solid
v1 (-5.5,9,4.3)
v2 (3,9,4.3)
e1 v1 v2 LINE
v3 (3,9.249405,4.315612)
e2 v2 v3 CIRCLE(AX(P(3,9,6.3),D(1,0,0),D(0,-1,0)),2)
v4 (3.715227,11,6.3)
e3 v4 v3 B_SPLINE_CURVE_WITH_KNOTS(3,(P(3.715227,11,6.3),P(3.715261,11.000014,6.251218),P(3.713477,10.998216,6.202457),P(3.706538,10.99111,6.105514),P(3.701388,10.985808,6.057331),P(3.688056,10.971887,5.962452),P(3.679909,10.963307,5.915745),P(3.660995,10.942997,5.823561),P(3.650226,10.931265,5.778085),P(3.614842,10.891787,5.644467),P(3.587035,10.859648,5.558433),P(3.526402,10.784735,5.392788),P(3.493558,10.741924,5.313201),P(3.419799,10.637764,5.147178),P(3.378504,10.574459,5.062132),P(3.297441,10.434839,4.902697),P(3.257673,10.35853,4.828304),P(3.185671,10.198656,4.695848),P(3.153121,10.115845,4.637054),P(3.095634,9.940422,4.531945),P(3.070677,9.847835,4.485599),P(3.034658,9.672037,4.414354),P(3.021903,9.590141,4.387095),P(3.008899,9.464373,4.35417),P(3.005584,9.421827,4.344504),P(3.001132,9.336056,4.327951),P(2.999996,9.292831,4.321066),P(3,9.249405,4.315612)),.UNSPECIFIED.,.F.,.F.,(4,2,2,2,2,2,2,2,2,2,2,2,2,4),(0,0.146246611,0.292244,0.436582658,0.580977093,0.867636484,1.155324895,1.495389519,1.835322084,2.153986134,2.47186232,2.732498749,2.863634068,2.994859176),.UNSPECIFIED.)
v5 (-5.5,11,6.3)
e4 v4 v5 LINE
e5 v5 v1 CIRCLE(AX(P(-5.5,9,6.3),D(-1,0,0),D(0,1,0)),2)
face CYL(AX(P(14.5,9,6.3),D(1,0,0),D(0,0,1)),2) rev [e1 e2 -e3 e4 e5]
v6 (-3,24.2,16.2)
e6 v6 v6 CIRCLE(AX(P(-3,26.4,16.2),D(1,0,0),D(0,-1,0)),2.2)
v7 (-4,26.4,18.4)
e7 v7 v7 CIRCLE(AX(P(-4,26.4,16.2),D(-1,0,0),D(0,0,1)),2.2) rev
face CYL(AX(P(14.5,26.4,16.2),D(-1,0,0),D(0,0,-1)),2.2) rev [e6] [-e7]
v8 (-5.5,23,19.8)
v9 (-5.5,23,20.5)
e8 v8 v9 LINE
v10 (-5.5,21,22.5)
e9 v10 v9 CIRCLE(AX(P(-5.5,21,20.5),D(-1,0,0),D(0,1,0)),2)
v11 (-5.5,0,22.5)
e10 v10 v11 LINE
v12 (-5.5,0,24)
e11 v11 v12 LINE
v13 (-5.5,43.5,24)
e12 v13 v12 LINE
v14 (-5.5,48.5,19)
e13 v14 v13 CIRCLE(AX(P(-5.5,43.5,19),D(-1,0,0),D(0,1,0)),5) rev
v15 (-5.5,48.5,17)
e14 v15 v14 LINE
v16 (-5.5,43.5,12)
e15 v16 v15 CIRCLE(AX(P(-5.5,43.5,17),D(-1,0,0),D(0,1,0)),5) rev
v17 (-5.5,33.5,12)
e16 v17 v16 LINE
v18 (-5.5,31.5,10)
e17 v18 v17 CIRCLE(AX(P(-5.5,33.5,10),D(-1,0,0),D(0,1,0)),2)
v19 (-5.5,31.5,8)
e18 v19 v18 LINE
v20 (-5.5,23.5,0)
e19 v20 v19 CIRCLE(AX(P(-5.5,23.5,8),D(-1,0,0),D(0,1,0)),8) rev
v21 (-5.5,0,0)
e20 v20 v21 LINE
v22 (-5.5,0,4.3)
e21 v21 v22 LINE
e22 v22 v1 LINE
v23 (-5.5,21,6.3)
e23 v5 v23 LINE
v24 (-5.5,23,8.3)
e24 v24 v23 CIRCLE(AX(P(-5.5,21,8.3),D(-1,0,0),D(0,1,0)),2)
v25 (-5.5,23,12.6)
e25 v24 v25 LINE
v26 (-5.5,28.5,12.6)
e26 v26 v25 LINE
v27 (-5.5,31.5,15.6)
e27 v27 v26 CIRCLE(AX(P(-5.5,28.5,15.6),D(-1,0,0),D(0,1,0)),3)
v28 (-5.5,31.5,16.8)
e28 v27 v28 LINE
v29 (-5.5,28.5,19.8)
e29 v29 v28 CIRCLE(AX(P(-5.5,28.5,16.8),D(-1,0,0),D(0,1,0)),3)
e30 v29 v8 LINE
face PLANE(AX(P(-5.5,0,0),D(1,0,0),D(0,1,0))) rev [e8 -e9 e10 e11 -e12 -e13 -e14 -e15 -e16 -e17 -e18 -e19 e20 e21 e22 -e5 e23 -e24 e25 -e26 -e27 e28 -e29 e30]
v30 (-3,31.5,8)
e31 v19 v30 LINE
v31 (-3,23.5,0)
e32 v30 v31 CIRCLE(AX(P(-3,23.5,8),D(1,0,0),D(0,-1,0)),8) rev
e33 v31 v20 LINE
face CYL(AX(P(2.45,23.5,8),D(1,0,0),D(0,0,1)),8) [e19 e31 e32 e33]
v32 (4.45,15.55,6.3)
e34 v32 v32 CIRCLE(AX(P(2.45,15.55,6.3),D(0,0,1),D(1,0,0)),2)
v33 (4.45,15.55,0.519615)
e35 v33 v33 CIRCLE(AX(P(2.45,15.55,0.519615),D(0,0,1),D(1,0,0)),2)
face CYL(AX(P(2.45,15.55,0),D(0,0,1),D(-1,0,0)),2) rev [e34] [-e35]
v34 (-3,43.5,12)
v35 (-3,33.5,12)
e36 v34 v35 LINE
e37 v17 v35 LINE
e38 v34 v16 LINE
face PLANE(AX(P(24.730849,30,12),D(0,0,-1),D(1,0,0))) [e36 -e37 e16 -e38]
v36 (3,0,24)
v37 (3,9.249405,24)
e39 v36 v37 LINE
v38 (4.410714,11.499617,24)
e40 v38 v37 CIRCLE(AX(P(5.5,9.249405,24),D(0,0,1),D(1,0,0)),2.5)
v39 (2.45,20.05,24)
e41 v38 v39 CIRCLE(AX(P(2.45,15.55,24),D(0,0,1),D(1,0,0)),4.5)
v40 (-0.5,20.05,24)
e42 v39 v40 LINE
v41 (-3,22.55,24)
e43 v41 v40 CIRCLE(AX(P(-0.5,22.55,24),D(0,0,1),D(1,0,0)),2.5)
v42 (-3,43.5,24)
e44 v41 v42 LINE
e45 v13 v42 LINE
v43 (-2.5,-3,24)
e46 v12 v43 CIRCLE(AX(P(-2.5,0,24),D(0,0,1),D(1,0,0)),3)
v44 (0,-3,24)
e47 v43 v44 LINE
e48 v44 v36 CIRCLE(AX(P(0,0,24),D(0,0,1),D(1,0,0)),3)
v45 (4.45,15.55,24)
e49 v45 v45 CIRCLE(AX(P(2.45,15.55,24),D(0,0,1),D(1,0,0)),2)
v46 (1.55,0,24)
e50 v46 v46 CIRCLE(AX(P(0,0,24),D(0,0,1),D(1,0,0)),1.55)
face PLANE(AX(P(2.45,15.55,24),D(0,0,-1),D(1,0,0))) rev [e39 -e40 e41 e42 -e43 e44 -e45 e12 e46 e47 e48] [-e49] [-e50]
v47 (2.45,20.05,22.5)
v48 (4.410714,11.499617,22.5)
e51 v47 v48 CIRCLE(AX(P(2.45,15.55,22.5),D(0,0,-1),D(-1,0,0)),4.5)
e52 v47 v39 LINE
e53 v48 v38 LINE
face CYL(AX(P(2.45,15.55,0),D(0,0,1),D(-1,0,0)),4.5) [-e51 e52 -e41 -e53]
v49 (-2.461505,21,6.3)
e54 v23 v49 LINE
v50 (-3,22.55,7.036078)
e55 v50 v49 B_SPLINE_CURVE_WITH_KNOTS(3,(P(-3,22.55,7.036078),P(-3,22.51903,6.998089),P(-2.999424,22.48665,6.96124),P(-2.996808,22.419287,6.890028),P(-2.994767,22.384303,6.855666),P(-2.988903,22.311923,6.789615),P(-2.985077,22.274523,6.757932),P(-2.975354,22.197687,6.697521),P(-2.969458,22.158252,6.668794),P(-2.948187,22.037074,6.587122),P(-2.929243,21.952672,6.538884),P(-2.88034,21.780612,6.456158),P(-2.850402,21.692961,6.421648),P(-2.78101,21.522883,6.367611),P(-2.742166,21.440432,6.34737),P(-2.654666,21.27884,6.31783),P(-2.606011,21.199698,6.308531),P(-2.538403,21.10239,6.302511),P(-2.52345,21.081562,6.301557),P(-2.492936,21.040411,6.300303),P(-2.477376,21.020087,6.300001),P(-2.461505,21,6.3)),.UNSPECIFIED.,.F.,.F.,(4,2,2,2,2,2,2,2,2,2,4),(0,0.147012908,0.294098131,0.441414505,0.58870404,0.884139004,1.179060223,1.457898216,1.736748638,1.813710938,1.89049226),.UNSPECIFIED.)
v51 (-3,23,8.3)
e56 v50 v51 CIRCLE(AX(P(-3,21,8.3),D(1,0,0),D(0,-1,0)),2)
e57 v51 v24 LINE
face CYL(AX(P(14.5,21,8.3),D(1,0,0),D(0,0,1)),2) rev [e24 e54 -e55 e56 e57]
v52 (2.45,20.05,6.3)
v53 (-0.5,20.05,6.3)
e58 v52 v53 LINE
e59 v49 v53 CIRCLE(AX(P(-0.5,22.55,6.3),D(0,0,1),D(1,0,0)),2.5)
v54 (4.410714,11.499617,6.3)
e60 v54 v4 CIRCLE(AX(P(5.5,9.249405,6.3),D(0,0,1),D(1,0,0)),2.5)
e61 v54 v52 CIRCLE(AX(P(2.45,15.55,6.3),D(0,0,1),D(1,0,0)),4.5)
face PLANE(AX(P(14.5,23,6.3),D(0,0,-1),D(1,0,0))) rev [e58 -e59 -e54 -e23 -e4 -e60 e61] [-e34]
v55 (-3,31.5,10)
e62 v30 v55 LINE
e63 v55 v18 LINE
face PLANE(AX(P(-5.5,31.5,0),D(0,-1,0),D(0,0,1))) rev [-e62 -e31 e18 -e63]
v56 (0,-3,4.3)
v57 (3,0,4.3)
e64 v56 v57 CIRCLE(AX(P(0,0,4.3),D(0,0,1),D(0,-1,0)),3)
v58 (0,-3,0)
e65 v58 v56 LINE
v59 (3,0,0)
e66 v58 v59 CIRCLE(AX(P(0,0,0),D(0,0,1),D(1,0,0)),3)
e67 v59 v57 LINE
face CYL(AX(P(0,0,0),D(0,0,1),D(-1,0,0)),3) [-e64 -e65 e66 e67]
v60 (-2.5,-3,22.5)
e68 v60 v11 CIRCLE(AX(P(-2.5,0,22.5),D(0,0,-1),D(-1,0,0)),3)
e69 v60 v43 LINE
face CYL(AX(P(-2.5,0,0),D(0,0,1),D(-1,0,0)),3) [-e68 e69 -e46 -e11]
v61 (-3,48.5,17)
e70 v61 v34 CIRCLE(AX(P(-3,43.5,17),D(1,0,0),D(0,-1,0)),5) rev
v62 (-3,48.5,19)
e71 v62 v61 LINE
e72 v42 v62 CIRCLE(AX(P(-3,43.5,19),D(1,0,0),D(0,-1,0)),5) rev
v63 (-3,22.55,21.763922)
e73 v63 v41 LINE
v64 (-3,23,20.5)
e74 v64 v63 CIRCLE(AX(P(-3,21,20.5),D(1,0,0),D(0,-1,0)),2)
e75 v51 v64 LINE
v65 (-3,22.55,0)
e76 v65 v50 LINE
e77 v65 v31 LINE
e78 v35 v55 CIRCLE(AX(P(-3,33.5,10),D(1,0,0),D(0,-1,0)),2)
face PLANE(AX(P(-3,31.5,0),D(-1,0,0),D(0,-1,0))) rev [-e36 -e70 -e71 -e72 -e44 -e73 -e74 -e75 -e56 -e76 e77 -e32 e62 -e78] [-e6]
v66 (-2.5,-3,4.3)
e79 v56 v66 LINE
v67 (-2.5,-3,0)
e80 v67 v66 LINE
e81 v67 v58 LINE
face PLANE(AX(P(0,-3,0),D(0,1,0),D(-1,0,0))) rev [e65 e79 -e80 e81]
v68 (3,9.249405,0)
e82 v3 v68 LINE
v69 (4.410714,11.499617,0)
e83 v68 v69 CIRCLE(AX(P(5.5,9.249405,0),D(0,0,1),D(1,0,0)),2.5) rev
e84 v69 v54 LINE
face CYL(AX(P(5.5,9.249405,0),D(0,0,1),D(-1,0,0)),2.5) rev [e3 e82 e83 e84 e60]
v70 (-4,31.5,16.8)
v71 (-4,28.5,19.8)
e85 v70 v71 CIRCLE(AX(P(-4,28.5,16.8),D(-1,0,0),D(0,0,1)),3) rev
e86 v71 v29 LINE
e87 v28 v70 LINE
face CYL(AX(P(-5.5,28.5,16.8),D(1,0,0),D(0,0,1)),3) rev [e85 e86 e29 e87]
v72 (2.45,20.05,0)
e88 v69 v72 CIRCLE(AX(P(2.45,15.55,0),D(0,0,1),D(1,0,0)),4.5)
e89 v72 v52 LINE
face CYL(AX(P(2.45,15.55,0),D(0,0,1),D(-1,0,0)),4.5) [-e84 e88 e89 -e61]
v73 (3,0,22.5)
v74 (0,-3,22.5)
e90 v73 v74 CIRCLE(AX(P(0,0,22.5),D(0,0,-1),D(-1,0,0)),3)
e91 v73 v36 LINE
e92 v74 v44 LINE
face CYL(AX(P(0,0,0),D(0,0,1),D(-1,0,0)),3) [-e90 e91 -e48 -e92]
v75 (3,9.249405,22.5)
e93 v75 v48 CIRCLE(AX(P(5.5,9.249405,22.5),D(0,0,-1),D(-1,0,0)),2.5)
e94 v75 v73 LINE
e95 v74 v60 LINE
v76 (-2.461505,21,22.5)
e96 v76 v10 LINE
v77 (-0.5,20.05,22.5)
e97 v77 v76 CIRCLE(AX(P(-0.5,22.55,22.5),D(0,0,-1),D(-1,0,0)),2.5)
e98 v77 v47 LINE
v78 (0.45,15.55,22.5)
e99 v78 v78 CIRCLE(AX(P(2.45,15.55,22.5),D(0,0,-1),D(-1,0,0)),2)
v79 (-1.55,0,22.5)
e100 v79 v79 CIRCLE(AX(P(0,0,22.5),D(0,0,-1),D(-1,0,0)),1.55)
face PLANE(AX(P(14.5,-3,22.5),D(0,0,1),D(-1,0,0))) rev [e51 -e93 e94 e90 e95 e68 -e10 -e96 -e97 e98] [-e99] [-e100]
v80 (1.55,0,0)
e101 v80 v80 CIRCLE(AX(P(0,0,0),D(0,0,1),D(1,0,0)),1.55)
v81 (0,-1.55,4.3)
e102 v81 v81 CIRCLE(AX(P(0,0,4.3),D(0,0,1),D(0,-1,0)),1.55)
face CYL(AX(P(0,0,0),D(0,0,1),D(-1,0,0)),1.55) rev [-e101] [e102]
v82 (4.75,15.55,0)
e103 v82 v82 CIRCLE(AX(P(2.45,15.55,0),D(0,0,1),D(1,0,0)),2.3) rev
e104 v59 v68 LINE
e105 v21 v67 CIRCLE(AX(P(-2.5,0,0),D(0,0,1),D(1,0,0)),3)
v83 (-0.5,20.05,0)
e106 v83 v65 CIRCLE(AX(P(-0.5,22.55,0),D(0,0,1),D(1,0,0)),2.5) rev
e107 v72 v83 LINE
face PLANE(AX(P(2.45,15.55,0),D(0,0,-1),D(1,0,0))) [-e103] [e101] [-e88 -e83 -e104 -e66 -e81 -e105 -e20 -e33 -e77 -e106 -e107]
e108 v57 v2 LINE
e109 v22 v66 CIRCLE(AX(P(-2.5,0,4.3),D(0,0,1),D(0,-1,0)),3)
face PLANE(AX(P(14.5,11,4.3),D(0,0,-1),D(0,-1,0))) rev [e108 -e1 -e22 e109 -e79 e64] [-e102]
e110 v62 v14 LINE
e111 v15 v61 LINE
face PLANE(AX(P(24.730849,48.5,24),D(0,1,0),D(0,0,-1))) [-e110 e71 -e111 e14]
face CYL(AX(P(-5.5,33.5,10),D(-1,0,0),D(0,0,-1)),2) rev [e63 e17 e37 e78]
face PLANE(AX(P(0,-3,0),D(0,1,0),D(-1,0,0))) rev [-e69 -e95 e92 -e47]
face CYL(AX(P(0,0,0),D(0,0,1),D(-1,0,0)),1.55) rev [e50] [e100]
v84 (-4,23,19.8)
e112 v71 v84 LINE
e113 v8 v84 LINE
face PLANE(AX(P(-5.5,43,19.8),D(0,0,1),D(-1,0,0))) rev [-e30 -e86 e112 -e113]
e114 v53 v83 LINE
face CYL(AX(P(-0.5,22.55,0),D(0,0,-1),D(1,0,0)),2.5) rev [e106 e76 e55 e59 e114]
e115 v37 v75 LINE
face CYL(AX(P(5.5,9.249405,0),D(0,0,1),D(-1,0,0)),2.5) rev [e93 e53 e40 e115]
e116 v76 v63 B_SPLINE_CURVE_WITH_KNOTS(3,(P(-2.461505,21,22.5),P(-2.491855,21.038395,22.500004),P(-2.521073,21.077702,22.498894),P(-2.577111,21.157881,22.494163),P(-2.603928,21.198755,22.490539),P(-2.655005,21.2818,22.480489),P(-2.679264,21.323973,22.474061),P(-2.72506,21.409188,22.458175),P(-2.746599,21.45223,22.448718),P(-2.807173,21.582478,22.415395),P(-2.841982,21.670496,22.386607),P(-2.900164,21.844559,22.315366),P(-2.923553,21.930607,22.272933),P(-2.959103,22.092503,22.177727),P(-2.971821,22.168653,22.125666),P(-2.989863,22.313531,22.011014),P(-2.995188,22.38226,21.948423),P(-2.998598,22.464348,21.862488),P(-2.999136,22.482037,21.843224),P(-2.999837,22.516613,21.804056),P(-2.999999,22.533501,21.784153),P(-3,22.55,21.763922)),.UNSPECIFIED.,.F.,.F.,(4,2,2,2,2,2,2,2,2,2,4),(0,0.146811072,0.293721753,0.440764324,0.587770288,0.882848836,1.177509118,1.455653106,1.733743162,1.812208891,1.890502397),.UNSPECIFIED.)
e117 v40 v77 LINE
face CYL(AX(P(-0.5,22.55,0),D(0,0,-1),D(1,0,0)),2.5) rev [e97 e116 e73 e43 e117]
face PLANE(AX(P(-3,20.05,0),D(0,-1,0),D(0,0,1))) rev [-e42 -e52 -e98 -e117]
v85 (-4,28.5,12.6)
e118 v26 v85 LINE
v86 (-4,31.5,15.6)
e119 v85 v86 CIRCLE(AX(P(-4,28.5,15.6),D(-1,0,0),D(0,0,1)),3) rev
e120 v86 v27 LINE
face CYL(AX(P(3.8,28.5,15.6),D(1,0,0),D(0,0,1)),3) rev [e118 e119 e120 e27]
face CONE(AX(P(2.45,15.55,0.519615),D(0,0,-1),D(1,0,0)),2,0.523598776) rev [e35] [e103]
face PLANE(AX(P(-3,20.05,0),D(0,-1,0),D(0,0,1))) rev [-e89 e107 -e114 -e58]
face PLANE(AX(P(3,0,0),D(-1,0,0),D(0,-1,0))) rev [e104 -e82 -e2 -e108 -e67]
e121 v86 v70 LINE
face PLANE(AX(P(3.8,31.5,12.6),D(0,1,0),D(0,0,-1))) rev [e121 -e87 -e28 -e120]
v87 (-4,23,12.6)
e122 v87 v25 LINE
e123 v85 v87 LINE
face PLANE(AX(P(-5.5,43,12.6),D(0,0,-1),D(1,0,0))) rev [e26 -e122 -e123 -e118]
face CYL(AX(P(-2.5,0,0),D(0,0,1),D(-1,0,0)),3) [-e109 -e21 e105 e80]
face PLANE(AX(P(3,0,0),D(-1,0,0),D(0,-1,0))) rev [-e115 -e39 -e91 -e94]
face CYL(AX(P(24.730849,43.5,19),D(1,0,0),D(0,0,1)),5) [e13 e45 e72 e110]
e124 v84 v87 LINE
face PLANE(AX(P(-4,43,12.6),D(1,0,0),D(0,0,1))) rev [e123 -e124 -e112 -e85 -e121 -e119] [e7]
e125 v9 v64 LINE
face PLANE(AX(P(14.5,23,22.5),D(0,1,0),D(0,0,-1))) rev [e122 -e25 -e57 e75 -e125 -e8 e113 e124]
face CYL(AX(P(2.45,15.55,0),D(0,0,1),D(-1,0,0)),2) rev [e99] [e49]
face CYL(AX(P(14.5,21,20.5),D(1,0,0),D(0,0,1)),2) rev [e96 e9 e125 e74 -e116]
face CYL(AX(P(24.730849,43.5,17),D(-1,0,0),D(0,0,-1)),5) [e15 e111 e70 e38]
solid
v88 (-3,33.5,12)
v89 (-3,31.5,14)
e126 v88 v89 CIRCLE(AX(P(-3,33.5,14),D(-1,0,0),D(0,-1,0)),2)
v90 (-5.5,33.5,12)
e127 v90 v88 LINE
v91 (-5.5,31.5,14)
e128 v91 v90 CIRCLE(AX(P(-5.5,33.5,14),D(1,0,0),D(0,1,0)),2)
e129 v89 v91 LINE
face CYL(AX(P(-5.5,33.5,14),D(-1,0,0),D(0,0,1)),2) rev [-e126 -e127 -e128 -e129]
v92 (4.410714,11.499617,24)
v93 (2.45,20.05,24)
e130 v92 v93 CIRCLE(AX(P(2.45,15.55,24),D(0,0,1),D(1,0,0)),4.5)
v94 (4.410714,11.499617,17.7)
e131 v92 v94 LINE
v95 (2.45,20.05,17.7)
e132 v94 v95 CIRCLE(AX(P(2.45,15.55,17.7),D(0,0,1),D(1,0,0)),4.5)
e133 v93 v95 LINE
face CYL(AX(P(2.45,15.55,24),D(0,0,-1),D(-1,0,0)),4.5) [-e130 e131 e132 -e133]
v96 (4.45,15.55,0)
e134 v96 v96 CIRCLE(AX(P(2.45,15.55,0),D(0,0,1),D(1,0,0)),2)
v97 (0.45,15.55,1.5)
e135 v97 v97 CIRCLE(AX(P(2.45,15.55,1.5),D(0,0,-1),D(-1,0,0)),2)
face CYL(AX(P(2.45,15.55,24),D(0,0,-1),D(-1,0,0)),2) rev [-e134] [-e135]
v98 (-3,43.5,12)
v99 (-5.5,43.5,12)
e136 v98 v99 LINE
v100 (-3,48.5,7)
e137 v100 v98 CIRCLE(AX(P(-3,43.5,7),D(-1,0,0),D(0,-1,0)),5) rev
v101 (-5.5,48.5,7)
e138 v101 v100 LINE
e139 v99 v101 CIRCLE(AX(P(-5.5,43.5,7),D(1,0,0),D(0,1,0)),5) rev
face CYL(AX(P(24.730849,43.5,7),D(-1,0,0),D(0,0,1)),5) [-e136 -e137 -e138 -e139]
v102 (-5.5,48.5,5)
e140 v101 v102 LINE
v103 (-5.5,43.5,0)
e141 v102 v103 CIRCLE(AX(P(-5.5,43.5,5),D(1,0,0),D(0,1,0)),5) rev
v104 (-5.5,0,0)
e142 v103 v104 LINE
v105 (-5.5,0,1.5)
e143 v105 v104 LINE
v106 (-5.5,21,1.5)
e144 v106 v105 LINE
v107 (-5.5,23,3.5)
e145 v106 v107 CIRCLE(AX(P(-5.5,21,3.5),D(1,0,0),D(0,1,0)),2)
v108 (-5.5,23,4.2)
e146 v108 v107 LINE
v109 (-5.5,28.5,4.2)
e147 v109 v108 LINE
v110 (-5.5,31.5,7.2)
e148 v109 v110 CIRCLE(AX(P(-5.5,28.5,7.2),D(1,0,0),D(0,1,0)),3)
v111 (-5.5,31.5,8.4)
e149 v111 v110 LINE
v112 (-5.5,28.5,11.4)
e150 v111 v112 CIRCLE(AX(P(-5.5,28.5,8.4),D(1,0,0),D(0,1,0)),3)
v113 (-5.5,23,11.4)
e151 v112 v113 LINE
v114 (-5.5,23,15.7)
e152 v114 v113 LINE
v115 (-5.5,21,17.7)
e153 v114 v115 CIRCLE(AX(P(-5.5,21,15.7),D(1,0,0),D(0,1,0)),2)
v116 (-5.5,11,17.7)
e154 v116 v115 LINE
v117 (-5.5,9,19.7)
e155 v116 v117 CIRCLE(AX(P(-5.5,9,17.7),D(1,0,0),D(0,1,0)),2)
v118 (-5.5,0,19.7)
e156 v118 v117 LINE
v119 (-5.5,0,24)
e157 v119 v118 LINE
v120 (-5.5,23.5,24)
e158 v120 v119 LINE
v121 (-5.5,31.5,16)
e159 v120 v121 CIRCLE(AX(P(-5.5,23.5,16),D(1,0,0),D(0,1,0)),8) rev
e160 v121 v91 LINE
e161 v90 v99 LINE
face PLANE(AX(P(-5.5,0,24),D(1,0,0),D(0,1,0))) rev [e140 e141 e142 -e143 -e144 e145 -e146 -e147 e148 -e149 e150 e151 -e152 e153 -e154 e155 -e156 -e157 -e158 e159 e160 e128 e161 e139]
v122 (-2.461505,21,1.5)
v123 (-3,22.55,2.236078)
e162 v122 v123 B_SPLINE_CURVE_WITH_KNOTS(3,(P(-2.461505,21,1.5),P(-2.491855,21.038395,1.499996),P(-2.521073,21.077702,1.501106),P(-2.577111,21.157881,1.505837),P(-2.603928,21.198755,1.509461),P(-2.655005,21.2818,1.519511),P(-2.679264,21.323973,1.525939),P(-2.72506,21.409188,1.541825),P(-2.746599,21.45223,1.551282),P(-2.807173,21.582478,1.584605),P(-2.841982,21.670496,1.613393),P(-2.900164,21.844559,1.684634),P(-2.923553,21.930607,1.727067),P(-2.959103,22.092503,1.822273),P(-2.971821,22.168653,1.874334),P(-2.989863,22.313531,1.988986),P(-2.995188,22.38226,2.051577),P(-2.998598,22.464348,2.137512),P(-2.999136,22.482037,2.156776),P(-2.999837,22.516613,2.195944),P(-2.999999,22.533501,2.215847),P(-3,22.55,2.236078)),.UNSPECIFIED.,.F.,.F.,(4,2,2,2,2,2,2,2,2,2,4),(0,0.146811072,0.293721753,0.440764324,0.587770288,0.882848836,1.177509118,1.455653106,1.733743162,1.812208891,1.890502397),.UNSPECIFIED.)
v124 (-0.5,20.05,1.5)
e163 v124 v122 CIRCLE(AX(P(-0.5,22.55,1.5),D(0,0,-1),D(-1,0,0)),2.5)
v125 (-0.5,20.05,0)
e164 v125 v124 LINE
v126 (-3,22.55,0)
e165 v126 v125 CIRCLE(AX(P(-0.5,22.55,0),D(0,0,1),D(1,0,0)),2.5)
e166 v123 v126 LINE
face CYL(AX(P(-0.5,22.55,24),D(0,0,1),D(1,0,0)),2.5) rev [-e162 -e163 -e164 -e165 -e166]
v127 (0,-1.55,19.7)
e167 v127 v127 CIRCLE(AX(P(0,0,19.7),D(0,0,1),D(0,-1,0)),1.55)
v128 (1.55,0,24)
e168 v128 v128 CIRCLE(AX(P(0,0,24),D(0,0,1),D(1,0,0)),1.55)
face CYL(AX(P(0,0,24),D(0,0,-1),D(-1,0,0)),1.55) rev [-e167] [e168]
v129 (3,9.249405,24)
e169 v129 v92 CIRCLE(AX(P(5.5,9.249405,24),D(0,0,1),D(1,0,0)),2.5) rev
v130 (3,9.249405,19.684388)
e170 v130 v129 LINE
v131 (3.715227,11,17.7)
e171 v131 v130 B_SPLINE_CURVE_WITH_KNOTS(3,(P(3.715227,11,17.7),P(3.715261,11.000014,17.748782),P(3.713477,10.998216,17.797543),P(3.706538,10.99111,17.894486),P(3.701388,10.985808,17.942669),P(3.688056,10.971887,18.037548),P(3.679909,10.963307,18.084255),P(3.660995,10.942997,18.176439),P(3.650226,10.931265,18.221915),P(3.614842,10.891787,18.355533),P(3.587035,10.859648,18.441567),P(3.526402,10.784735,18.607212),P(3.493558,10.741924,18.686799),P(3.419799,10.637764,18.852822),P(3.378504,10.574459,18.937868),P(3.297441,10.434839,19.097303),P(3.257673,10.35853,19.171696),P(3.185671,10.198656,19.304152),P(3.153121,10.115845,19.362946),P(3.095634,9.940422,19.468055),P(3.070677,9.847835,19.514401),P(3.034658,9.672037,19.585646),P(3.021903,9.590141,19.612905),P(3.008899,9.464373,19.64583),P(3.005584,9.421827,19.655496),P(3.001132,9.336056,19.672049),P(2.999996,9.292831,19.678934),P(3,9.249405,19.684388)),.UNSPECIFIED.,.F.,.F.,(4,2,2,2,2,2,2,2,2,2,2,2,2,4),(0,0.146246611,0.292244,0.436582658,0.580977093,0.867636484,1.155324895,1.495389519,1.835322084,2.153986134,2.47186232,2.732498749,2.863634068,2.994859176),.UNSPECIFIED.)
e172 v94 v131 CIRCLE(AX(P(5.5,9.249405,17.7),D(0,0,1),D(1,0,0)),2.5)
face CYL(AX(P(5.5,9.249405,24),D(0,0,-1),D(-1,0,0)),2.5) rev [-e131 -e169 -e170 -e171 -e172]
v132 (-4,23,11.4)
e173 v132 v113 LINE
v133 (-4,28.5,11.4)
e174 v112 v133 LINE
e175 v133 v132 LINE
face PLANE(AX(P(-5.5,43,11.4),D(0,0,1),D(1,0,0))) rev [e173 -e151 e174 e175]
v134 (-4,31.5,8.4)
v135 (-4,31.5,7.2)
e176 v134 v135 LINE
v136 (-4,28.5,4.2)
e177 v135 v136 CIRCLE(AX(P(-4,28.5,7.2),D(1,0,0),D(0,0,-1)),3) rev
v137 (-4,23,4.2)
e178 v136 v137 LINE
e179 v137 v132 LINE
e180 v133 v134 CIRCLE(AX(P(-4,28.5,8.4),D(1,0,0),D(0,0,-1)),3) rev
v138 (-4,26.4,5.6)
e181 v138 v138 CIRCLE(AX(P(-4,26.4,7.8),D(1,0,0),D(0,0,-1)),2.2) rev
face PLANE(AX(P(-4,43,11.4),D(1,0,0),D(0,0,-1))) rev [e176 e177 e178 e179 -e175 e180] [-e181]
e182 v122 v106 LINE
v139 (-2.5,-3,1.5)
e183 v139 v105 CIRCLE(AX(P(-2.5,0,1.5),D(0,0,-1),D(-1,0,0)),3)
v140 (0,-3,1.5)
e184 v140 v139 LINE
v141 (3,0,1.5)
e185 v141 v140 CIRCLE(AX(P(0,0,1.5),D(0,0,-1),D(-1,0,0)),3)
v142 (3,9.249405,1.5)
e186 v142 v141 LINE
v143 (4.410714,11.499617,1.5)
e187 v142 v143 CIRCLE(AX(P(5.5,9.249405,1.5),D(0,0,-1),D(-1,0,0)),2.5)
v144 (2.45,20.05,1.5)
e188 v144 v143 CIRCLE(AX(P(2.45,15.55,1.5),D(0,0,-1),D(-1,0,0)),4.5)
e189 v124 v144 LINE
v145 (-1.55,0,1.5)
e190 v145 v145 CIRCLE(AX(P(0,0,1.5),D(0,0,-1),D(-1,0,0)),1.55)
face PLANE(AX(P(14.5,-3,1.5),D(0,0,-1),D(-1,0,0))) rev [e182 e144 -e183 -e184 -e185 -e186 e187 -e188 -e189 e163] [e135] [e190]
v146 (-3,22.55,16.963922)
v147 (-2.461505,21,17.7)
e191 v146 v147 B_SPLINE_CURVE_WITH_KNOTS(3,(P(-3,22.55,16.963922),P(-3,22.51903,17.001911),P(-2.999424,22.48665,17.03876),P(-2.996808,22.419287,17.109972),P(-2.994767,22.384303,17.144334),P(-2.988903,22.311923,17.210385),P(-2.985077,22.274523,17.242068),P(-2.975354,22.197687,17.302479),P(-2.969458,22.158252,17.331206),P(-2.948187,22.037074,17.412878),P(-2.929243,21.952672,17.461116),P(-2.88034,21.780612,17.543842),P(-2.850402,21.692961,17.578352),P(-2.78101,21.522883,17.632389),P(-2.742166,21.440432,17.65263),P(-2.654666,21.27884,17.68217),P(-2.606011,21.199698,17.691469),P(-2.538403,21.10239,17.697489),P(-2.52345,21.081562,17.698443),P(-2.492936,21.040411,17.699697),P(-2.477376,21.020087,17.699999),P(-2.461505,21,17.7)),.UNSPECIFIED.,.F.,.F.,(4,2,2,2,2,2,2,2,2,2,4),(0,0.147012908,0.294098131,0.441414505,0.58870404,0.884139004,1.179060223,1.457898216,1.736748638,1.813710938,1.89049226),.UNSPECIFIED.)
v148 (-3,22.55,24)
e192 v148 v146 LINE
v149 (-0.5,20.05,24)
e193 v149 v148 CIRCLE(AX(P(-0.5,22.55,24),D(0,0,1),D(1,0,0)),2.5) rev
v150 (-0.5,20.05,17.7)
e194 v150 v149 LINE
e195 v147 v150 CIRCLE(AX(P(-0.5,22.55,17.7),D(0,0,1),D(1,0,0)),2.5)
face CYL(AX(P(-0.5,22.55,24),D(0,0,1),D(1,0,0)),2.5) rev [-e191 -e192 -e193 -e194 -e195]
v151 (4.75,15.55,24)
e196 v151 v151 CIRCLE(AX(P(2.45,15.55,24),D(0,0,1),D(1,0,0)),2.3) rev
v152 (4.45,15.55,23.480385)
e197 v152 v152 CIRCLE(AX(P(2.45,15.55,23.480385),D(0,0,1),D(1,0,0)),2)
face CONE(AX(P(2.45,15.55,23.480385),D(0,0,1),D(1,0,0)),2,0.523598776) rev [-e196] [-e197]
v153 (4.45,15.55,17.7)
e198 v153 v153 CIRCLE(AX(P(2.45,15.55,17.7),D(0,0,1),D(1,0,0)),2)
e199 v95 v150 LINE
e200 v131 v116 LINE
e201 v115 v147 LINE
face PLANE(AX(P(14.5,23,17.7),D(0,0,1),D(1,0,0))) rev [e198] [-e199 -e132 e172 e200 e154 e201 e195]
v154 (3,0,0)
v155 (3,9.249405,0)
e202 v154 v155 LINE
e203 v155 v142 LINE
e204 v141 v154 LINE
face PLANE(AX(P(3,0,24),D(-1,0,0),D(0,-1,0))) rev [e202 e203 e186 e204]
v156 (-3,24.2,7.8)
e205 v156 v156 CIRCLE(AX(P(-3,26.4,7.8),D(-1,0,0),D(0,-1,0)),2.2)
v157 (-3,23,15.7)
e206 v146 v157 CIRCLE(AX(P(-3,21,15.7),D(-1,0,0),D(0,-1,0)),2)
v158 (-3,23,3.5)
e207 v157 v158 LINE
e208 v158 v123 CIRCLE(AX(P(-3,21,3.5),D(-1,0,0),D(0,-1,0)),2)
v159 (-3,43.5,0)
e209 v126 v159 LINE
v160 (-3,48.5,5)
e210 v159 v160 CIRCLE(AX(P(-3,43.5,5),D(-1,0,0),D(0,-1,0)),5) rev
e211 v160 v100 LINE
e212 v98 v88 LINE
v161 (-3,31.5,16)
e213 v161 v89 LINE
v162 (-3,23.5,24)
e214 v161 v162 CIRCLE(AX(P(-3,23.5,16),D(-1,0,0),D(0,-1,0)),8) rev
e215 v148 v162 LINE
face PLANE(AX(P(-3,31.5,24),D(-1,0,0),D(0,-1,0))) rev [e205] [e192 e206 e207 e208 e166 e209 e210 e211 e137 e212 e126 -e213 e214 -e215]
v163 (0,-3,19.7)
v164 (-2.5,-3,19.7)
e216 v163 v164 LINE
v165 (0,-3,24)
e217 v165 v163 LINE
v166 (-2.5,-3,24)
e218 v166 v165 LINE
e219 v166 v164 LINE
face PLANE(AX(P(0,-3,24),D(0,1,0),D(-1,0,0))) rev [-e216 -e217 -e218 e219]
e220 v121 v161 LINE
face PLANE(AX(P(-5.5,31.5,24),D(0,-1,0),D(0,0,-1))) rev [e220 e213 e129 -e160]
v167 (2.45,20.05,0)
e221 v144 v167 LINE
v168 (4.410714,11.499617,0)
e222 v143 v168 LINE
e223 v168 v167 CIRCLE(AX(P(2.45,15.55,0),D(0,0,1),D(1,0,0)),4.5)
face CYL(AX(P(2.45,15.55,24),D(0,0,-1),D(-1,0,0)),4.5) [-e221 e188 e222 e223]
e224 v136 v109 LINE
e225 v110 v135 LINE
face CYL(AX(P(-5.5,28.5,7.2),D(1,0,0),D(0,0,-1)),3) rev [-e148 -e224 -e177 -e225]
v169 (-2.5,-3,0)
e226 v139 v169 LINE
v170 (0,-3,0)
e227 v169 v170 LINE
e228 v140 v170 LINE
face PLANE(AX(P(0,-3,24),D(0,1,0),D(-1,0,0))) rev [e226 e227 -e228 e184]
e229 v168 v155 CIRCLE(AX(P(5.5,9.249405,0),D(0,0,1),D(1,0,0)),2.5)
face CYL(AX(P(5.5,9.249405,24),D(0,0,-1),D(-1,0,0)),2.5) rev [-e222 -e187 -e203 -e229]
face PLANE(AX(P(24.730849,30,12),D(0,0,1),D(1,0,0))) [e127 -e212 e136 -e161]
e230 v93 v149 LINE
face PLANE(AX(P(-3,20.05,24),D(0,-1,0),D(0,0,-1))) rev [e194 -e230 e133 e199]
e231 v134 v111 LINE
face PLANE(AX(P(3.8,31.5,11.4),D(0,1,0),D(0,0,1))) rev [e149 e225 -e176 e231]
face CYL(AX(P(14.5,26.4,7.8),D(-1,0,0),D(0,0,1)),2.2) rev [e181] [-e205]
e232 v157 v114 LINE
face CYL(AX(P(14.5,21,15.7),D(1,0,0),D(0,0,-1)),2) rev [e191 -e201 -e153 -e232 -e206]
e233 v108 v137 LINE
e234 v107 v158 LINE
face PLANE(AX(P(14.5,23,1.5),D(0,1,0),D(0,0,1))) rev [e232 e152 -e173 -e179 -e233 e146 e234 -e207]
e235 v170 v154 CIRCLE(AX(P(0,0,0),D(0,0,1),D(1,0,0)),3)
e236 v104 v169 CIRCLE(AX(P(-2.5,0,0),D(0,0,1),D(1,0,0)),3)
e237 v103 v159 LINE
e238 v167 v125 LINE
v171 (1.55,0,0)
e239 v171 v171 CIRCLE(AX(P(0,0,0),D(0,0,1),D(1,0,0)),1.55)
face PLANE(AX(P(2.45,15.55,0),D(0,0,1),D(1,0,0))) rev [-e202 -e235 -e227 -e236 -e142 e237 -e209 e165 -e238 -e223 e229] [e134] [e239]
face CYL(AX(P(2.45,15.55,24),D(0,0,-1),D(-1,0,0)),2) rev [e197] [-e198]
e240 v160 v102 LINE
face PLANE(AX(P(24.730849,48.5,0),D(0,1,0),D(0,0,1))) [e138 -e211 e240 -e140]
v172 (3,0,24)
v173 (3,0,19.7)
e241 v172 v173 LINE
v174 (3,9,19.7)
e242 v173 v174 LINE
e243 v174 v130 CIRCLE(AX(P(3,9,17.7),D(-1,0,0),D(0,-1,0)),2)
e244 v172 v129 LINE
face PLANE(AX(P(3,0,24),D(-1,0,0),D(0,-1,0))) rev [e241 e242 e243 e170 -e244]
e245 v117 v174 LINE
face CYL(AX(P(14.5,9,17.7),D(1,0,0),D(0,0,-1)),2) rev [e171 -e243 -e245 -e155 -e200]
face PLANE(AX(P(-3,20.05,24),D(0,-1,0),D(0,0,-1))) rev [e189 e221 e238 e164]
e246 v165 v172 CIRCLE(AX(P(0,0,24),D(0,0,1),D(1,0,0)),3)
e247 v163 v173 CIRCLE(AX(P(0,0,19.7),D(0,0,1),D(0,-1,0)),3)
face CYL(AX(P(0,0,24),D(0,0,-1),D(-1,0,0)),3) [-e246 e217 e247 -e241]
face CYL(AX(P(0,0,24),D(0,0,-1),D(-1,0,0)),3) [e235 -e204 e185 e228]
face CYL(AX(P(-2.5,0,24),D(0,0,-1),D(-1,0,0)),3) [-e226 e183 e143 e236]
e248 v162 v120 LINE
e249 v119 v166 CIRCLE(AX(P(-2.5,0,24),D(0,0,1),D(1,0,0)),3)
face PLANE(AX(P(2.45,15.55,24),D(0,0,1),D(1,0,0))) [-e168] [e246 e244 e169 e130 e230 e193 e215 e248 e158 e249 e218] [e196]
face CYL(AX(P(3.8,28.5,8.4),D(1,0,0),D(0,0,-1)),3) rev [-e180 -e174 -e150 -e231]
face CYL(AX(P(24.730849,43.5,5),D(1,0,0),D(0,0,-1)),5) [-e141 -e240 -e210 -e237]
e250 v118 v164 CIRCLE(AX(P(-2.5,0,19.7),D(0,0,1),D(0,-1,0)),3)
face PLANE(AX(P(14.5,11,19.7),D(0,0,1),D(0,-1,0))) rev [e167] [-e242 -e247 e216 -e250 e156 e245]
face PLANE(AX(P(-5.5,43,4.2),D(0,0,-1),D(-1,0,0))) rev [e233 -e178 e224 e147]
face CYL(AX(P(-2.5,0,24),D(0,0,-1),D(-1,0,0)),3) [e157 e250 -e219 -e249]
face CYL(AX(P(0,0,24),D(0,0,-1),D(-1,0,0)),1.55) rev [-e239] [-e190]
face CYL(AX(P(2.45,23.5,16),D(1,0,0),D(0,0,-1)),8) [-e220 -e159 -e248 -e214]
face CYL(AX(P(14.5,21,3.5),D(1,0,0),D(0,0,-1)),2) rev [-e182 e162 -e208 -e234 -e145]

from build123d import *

# Parameters (mm, degrees)
CROQUIS1_R              = 2
CROQUIS1_R_2            = 1.55
SALIENTE_EXTRUIR1_DEPTH = 24
CORTAR_EXTRUIR1_DEPTH   = 20
REDONDEO1_R             = 8
REDONDEO2_R             = 2
REDONDEO5_R             = 2.5
CROQUIS3_R              = 2.2
CORTAR_EXTRUIR2_DEPTH   = 20
CROQUIS4_W              = 1.5
CROQUIS4_H              = 7.2
CORTAR_EXTRUIR3_DEPTH   = 20
SALIENTE_EXTRUIR2_REACH = 43.512
REDONDEO7_R             = 2
CROQUIS6_W              = 7.2
CROQUIS6_H              = 3
CORTAR_EXTRUIR4_DEPTH   = 1.5
REDONDEO8_R             = 3
REDONDEO9_R             = 5
CHAFL_N1_SIZE           = 0.3
CHAFL_N1_SIZE2          = 0.519615242


with BuildPart() as part:
    # Croquis1 → Saliente-Extruir1 (new body)
    with BuildSketch(Plane.XY):
        with BuildLine():
            Line((-5.5, 0), (-5.5, 31.5))
            Line((-5.5, 31.5), (-3, 31.5))
            Line((-3, 31.5), (-3, 20.05))
            Line((-3, 20.05), (2.45, 20.05))
            ThreePointArc((2.45, 20.05), (6.941557686, 15.825516889), (3, 11.08373758))
            Line((3, 11.08373758), (3, 0))
            ThreePointArc((3, 0), (2.121320344, -2.121320344), (0, -3))
            Line((0, -3), (-2.5, -3))
            ThreePointArc((-2.5, -3), (-4.621320344, -2.121320344), (-5.5, 0))
        make_face()
        with Locations((2.45, 15.55)):
            Circle(CROQUIS1_R, mode=Mode.SUBTRACT)
        Circle(CROQUIS1_R_2, mode=Mode.SUBTRACT)
    extrude(amount=SALIENTE_EXTRUIR1_DEPTH)

    # Croquis2 → Cortar-Extruir1 (cut)
    with BuildSketch(Plane.ZY.offset(5.5)):
        Polygon((1.5, -3), (19.7, -3), (19.7, 11), (17.7, 11), (17.7, 23), (1.5, 23), align=None)
    extrude(amount=-CORTAR_EXTRUIR1_DEPTH, mode=Mode.SUBTRACT)

    # Redondeo1
    redondeo1_edges = [part.edges().sort_by_distance(p)[0] for p in [
        (-4.25, 31.5, 0),
        (-4.25, 31.5, 24),
    ]]
    fillet(redondeo1_edges, radius=REDONDEO1_R)

    # Redondeo2
    redondeo2_edges = [part.edges().sort_by_distance(p)[0] for p in [
        (-1.25, 11, 19.7),
        (-4.25, 23, 17.7),
        (-4.25, 23, 1.5),
    ]]
    fillet(redondeo2_edges, radius=REDONDEO2_R - 0.0001)  # a hair under: the kernel refuses the full size

    # Redondeo5
    redondeo5_edges = [part.edges().sort_by_distance(p)[0] for p in [
        (3, 11.08373758, 0.75),
        (-3, 20.05, 20.85),
        (3, 11.08373758, 20.85),
        (-3, 20.05, 0.75),
    ]]
    fillet(redondeo5_edges, radius=REDONDEO5_R)

    # Croquis3 → Cortar-Extruir2 (cut)
    with BuildSketch(Plane.ZY.offset(5.5)):
        with Locations((7.8, 26.4)):
            Circle(CROQUIS3_R)
    extrude(amount=-CORTAR_EXTRUIR2_DEPTH, mode=Mode.SUBTRACT)

    # Croquis4 → Cortar-Extruir3 (cut)
    with BuildSketch(Plane.XZ.offset(-23)):
        with Locations((-4.75, 7.8)):
            Rectangle(CROQUIS4_W, CROQUIS4_H)
    extrude(amount=-CORTAR_EXTRUIR3_DEPTH, mode=Mode.SUBTRACT)

    # Saliente-Extruir2: up to this face of the body (flat: up to its plane)
    saliente_extruir2_end = Plane(part.part.faces().sort_by_distance((-3, 26.79790631, 12.475730365))[0])
    # Croquis5 → Saliente-Extruir2 (add, up to the picked face)
    with BuildSketch(Plane.ZY.offset(5.5), mode=Mode.PRIVATE) as saliente_extruir2_sk1:
        Polygon((0, 23.5), (0, 48.5), (12, 48.5), (12, 30), (4.2, 30), align=None)
    saliente_extruir2_tool1 = split(extrude(saliente_extruir2_sk1.sketch, amount=-SALIENTE_EXTRUIR2_REACH, mode=Mode.PRIVATE), bisect_by=saliente_extruir2_end, keep=Keep.BOTH, mode=Mode.PRIVATE)
    add(saliente_extruir2_tool1.solids().sort_by(Axis((-5.5, 38.588691, 5.733546), (1, 0, 0)))[0])

    # Redondeo7
    redondeo7_edges = [part.edges().sort_by_distance(p)[0] for p in [
        (-4.25, 31.5, 12),
    ]]
    fillet(redondeo7_edges, radius=REDONDEO7_R)

    # Croquis6 → Cortar-Extruir4 (cut)
    with BuildSketch(Plane.ZY.offset(5.5)):
        with Locations((7.8, 30)):
            Rectangle(CROQUIS6_W, CROQUIS6_H)
    extrude(amount=-CORTAR_EXTRUIR4_DEPTH, mode=Mode.SUBTRACT)

    # Redondeo8
    redondeo8_edges = [part.edges().sort_by_distance(p)[0] for p in [
        (-4.75, 31.5, 4.2),
        (-4.75, 31.5, 11.4),
    ]]
    fillet(redondeo8_edges, radius=REDONDEO8_R)

    # Redondeo9
    redondeo9_edges = [part.edges().sort_by_distance(p)[0] for p in [
        (-4.25, 48.5, 12),
        (-4.25, 48.5, 0),
    ]]
    fillet(redondeo9_edges, radius=REDONDEO9_R)

    # Chaflán1
    chafl_n1_edges = [part.edges().sort_by_distance(p)[0] for p in [
        (0.45, 15.55, 24),
    ]]
    chafl_n1_side = [part.faces().sort_by_distance(p)[0] for p in [
        (-0.877926413, 10.141568141, 24),
    ]]
    chamfer(chafl_n1_edges, length=CHAFL_N1_SIZE, length2=CHAFL_N1_SIZE2, reference=chafl_n1_side[0])


with BuildPart() as body_2:
    # Simetría1: mirrored copy
    add(part.part.mirror(Plane.XY.offset(12)))


solid = Compound([part.part, body_2.part])
